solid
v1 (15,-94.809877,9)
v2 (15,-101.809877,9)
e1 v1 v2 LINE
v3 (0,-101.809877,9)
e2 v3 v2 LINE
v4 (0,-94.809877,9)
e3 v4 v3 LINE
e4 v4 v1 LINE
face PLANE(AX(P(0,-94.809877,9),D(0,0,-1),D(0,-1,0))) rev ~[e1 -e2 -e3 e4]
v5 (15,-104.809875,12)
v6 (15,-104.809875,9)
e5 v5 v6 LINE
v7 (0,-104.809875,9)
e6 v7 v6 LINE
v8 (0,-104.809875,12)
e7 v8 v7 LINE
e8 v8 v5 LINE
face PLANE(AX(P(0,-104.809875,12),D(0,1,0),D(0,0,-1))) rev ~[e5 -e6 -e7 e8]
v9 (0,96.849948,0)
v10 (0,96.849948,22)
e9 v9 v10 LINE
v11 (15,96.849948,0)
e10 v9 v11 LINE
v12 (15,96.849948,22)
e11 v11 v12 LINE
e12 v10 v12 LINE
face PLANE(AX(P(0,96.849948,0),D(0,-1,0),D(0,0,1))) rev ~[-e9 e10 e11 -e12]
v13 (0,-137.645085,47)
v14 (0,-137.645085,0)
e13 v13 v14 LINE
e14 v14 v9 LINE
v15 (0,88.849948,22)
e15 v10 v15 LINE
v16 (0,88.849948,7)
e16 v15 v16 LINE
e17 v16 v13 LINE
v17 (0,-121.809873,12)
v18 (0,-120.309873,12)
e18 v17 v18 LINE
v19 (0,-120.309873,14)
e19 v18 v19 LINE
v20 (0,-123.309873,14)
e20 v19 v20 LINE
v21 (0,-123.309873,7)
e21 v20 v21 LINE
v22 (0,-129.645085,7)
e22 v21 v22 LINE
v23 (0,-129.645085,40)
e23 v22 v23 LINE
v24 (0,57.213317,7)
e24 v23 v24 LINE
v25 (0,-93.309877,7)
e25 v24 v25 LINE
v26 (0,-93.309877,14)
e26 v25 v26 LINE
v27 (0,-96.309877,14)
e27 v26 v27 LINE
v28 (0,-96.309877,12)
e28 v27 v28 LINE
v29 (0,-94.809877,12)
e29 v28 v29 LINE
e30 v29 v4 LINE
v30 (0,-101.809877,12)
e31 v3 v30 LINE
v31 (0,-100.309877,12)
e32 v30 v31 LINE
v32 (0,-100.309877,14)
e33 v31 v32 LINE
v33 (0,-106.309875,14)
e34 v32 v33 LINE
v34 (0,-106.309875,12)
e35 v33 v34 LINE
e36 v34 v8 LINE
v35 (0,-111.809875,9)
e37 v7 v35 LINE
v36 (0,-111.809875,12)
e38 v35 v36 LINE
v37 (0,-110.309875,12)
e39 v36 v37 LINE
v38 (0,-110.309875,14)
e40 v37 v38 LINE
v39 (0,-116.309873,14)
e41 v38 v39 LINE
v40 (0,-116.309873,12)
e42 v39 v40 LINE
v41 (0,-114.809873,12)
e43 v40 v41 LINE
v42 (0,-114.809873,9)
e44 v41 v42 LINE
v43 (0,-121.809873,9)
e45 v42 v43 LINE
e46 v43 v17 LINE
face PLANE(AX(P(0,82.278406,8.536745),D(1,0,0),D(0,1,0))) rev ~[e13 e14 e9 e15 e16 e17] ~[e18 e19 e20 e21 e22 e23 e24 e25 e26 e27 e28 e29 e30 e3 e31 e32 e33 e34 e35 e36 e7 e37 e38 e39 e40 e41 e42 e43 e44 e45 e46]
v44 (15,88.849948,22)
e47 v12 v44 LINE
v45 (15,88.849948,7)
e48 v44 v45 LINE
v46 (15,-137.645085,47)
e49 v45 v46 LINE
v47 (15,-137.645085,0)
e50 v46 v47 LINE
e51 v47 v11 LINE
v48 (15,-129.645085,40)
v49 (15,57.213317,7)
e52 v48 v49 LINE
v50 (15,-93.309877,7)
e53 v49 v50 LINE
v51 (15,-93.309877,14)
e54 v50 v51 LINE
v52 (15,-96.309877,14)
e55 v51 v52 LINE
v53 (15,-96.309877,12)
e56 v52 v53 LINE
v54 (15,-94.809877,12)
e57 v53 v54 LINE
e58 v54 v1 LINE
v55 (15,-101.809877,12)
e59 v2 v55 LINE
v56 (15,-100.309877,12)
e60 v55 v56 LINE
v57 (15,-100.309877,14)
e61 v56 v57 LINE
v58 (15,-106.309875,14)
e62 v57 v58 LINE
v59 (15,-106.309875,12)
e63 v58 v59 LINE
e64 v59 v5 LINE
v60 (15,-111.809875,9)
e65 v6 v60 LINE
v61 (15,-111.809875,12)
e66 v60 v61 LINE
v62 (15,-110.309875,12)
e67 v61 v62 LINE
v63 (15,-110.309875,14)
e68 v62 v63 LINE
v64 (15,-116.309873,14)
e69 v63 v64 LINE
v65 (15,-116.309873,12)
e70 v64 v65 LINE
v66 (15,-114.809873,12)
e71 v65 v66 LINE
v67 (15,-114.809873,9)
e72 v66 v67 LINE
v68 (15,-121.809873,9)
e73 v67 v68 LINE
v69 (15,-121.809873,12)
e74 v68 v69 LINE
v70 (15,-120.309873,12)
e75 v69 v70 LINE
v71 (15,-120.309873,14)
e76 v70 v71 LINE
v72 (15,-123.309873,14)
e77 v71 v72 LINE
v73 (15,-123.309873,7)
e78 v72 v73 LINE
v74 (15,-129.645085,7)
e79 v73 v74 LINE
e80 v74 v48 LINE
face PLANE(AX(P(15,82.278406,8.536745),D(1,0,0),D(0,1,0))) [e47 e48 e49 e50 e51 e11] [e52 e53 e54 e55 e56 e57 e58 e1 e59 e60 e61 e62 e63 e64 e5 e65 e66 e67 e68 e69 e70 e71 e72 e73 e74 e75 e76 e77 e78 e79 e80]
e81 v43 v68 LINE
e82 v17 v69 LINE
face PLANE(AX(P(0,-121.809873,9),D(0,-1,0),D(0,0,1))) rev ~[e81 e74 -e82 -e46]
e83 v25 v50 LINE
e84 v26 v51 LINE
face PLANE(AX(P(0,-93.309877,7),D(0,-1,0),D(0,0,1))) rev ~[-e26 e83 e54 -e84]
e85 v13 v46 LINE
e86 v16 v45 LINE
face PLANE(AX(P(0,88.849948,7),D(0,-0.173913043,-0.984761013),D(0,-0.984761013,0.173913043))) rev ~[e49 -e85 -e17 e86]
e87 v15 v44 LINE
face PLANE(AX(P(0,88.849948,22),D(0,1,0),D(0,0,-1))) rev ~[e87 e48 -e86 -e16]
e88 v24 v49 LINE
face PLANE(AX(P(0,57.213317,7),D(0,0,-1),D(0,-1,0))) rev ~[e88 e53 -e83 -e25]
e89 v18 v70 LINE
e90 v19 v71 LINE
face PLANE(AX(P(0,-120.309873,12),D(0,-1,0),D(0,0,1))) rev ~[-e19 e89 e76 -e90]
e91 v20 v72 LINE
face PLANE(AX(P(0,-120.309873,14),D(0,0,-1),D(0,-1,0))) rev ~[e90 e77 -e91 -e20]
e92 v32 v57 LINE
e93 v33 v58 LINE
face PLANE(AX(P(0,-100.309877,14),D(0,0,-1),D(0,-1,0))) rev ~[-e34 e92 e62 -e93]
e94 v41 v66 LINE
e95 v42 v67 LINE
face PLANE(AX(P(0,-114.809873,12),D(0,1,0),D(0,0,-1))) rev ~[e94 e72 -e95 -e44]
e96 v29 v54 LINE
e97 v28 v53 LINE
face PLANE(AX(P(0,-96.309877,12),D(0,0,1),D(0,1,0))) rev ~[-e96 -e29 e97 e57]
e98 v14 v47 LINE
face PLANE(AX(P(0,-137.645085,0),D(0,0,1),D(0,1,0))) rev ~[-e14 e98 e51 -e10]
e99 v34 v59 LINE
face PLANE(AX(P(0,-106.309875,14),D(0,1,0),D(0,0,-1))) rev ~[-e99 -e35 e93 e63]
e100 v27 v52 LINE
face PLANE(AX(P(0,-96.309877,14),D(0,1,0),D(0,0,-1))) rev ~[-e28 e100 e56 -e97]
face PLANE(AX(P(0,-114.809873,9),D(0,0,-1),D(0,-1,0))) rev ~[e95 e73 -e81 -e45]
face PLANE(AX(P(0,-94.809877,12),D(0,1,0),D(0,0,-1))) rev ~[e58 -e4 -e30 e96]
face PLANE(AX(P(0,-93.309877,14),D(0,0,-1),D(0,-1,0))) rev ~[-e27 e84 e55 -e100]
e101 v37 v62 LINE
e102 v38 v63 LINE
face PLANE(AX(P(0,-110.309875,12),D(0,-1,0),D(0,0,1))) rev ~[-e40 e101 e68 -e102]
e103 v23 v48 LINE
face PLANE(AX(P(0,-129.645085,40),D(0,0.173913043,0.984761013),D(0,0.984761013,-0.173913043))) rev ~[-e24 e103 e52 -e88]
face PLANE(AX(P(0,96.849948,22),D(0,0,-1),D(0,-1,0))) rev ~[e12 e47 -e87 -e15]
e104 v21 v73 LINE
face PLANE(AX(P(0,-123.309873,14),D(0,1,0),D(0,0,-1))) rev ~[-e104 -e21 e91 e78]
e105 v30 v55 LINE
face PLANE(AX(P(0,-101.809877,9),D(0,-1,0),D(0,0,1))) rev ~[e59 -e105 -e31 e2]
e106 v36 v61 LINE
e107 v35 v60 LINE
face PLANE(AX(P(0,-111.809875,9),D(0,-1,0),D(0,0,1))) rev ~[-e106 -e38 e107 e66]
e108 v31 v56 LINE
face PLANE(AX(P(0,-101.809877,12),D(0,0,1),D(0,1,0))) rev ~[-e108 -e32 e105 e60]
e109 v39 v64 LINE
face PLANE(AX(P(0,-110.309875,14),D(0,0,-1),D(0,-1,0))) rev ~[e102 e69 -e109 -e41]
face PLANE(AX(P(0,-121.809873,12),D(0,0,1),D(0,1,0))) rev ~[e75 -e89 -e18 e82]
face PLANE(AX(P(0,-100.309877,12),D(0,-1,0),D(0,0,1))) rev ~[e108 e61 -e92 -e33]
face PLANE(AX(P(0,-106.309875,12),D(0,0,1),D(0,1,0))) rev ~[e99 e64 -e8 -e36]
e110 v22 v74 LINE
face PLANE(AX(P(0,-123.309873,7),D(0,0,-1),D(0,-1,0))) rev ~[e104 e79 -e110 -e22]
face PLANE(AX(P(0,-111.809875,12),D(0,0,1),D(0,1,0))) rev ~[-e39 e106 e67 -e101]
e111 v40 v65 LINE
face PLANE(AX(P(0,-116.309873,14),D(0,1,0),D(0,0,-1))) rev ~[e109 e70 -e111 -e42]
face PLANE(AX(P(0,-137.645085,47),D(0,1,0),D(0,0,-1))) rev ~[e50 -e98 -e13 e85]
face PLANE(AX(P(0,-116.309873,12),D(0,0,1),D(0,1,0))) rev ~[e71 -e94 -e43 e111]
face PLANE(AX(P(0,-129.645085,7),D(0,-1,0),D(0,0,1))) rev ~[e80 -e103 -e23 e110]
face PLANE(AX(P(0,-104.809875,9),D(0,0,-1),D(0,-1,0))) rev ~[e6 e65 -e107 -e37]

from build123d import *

# Parameters (mm, degrees)
F1_DEPTH = 15


# Not quite as in the source:
# - ends of sketch curves that miss each other by under 0.0002 mm in the source are joined


with BuildPart() as f1:
    # F0 (on Right) → F1 (new body)
    with BuildSketch(Plane.YZ):
        Polygon((57.2133171244, 7), (96.8499479096, 0), (96.8499479096, 22), (88.8499479096, 22), (88.8499479096, 7), align=None)
        Polygon((-129.6450851485, 0), (96.8499479096, 0), (57.2133171244, 7), (-93.3098772168, 7), (-103.3098761737, 7), (-113.3098740876, 7), (-123.3098730445, 7), (-129.6450851485, 7), align=None)
        Polygon((-129.6450851485, 40), (57.2133171244, 7), (88.8499479096, 7), (-137.6450851485, 47), (-137.6450851485, 0), (-129.6450851485, 0), (-129.6450851485, 7), align=None)
        Polygon((-123.3098730445, 14), (-123.3098730445, 7), (-113.3098740876, 7), (-113.3098730445, 14), (-116.3098730445, 14), (-116.3098730445, 12), (-114.8098730445, 12), (-114.8098730445, 9), (-121.8098730445, 9), (-121.8098730445, 12), (-120.3098730445, 12), (-120.3098730445, 14), align=None)
        Polygon((-113.3098740876, 7), (-103.3098761737, 7), (-103.3098751307, 14), (-106.3098751307, 14), (-106.3098751307, 12), (-104.8098751307, 12), (-104.8098751307, 9), (-111.8098751307, 9), (-111.8098751307, 12), (-110.3098751307, 12), (-110.3098751307, 14), (-113.3098751307, 14), align=None)
        Polygon((-103.3098761737, 7), (-93.3098772168, 7), (-93.3098772168, 14), (-96.3098772168, 14), (-96.3098772168, 12), (-94.8098772168, 12), (-94.8098772168, 9), (-101.8098772168, 9), (-101.8098772168, 12), (-100.3098772168, 12), (-100.3098772168, 14), (-103.3098772168, 14), align=None)
    extrude(amount=F1_DEPTH)


solid = f1.part
